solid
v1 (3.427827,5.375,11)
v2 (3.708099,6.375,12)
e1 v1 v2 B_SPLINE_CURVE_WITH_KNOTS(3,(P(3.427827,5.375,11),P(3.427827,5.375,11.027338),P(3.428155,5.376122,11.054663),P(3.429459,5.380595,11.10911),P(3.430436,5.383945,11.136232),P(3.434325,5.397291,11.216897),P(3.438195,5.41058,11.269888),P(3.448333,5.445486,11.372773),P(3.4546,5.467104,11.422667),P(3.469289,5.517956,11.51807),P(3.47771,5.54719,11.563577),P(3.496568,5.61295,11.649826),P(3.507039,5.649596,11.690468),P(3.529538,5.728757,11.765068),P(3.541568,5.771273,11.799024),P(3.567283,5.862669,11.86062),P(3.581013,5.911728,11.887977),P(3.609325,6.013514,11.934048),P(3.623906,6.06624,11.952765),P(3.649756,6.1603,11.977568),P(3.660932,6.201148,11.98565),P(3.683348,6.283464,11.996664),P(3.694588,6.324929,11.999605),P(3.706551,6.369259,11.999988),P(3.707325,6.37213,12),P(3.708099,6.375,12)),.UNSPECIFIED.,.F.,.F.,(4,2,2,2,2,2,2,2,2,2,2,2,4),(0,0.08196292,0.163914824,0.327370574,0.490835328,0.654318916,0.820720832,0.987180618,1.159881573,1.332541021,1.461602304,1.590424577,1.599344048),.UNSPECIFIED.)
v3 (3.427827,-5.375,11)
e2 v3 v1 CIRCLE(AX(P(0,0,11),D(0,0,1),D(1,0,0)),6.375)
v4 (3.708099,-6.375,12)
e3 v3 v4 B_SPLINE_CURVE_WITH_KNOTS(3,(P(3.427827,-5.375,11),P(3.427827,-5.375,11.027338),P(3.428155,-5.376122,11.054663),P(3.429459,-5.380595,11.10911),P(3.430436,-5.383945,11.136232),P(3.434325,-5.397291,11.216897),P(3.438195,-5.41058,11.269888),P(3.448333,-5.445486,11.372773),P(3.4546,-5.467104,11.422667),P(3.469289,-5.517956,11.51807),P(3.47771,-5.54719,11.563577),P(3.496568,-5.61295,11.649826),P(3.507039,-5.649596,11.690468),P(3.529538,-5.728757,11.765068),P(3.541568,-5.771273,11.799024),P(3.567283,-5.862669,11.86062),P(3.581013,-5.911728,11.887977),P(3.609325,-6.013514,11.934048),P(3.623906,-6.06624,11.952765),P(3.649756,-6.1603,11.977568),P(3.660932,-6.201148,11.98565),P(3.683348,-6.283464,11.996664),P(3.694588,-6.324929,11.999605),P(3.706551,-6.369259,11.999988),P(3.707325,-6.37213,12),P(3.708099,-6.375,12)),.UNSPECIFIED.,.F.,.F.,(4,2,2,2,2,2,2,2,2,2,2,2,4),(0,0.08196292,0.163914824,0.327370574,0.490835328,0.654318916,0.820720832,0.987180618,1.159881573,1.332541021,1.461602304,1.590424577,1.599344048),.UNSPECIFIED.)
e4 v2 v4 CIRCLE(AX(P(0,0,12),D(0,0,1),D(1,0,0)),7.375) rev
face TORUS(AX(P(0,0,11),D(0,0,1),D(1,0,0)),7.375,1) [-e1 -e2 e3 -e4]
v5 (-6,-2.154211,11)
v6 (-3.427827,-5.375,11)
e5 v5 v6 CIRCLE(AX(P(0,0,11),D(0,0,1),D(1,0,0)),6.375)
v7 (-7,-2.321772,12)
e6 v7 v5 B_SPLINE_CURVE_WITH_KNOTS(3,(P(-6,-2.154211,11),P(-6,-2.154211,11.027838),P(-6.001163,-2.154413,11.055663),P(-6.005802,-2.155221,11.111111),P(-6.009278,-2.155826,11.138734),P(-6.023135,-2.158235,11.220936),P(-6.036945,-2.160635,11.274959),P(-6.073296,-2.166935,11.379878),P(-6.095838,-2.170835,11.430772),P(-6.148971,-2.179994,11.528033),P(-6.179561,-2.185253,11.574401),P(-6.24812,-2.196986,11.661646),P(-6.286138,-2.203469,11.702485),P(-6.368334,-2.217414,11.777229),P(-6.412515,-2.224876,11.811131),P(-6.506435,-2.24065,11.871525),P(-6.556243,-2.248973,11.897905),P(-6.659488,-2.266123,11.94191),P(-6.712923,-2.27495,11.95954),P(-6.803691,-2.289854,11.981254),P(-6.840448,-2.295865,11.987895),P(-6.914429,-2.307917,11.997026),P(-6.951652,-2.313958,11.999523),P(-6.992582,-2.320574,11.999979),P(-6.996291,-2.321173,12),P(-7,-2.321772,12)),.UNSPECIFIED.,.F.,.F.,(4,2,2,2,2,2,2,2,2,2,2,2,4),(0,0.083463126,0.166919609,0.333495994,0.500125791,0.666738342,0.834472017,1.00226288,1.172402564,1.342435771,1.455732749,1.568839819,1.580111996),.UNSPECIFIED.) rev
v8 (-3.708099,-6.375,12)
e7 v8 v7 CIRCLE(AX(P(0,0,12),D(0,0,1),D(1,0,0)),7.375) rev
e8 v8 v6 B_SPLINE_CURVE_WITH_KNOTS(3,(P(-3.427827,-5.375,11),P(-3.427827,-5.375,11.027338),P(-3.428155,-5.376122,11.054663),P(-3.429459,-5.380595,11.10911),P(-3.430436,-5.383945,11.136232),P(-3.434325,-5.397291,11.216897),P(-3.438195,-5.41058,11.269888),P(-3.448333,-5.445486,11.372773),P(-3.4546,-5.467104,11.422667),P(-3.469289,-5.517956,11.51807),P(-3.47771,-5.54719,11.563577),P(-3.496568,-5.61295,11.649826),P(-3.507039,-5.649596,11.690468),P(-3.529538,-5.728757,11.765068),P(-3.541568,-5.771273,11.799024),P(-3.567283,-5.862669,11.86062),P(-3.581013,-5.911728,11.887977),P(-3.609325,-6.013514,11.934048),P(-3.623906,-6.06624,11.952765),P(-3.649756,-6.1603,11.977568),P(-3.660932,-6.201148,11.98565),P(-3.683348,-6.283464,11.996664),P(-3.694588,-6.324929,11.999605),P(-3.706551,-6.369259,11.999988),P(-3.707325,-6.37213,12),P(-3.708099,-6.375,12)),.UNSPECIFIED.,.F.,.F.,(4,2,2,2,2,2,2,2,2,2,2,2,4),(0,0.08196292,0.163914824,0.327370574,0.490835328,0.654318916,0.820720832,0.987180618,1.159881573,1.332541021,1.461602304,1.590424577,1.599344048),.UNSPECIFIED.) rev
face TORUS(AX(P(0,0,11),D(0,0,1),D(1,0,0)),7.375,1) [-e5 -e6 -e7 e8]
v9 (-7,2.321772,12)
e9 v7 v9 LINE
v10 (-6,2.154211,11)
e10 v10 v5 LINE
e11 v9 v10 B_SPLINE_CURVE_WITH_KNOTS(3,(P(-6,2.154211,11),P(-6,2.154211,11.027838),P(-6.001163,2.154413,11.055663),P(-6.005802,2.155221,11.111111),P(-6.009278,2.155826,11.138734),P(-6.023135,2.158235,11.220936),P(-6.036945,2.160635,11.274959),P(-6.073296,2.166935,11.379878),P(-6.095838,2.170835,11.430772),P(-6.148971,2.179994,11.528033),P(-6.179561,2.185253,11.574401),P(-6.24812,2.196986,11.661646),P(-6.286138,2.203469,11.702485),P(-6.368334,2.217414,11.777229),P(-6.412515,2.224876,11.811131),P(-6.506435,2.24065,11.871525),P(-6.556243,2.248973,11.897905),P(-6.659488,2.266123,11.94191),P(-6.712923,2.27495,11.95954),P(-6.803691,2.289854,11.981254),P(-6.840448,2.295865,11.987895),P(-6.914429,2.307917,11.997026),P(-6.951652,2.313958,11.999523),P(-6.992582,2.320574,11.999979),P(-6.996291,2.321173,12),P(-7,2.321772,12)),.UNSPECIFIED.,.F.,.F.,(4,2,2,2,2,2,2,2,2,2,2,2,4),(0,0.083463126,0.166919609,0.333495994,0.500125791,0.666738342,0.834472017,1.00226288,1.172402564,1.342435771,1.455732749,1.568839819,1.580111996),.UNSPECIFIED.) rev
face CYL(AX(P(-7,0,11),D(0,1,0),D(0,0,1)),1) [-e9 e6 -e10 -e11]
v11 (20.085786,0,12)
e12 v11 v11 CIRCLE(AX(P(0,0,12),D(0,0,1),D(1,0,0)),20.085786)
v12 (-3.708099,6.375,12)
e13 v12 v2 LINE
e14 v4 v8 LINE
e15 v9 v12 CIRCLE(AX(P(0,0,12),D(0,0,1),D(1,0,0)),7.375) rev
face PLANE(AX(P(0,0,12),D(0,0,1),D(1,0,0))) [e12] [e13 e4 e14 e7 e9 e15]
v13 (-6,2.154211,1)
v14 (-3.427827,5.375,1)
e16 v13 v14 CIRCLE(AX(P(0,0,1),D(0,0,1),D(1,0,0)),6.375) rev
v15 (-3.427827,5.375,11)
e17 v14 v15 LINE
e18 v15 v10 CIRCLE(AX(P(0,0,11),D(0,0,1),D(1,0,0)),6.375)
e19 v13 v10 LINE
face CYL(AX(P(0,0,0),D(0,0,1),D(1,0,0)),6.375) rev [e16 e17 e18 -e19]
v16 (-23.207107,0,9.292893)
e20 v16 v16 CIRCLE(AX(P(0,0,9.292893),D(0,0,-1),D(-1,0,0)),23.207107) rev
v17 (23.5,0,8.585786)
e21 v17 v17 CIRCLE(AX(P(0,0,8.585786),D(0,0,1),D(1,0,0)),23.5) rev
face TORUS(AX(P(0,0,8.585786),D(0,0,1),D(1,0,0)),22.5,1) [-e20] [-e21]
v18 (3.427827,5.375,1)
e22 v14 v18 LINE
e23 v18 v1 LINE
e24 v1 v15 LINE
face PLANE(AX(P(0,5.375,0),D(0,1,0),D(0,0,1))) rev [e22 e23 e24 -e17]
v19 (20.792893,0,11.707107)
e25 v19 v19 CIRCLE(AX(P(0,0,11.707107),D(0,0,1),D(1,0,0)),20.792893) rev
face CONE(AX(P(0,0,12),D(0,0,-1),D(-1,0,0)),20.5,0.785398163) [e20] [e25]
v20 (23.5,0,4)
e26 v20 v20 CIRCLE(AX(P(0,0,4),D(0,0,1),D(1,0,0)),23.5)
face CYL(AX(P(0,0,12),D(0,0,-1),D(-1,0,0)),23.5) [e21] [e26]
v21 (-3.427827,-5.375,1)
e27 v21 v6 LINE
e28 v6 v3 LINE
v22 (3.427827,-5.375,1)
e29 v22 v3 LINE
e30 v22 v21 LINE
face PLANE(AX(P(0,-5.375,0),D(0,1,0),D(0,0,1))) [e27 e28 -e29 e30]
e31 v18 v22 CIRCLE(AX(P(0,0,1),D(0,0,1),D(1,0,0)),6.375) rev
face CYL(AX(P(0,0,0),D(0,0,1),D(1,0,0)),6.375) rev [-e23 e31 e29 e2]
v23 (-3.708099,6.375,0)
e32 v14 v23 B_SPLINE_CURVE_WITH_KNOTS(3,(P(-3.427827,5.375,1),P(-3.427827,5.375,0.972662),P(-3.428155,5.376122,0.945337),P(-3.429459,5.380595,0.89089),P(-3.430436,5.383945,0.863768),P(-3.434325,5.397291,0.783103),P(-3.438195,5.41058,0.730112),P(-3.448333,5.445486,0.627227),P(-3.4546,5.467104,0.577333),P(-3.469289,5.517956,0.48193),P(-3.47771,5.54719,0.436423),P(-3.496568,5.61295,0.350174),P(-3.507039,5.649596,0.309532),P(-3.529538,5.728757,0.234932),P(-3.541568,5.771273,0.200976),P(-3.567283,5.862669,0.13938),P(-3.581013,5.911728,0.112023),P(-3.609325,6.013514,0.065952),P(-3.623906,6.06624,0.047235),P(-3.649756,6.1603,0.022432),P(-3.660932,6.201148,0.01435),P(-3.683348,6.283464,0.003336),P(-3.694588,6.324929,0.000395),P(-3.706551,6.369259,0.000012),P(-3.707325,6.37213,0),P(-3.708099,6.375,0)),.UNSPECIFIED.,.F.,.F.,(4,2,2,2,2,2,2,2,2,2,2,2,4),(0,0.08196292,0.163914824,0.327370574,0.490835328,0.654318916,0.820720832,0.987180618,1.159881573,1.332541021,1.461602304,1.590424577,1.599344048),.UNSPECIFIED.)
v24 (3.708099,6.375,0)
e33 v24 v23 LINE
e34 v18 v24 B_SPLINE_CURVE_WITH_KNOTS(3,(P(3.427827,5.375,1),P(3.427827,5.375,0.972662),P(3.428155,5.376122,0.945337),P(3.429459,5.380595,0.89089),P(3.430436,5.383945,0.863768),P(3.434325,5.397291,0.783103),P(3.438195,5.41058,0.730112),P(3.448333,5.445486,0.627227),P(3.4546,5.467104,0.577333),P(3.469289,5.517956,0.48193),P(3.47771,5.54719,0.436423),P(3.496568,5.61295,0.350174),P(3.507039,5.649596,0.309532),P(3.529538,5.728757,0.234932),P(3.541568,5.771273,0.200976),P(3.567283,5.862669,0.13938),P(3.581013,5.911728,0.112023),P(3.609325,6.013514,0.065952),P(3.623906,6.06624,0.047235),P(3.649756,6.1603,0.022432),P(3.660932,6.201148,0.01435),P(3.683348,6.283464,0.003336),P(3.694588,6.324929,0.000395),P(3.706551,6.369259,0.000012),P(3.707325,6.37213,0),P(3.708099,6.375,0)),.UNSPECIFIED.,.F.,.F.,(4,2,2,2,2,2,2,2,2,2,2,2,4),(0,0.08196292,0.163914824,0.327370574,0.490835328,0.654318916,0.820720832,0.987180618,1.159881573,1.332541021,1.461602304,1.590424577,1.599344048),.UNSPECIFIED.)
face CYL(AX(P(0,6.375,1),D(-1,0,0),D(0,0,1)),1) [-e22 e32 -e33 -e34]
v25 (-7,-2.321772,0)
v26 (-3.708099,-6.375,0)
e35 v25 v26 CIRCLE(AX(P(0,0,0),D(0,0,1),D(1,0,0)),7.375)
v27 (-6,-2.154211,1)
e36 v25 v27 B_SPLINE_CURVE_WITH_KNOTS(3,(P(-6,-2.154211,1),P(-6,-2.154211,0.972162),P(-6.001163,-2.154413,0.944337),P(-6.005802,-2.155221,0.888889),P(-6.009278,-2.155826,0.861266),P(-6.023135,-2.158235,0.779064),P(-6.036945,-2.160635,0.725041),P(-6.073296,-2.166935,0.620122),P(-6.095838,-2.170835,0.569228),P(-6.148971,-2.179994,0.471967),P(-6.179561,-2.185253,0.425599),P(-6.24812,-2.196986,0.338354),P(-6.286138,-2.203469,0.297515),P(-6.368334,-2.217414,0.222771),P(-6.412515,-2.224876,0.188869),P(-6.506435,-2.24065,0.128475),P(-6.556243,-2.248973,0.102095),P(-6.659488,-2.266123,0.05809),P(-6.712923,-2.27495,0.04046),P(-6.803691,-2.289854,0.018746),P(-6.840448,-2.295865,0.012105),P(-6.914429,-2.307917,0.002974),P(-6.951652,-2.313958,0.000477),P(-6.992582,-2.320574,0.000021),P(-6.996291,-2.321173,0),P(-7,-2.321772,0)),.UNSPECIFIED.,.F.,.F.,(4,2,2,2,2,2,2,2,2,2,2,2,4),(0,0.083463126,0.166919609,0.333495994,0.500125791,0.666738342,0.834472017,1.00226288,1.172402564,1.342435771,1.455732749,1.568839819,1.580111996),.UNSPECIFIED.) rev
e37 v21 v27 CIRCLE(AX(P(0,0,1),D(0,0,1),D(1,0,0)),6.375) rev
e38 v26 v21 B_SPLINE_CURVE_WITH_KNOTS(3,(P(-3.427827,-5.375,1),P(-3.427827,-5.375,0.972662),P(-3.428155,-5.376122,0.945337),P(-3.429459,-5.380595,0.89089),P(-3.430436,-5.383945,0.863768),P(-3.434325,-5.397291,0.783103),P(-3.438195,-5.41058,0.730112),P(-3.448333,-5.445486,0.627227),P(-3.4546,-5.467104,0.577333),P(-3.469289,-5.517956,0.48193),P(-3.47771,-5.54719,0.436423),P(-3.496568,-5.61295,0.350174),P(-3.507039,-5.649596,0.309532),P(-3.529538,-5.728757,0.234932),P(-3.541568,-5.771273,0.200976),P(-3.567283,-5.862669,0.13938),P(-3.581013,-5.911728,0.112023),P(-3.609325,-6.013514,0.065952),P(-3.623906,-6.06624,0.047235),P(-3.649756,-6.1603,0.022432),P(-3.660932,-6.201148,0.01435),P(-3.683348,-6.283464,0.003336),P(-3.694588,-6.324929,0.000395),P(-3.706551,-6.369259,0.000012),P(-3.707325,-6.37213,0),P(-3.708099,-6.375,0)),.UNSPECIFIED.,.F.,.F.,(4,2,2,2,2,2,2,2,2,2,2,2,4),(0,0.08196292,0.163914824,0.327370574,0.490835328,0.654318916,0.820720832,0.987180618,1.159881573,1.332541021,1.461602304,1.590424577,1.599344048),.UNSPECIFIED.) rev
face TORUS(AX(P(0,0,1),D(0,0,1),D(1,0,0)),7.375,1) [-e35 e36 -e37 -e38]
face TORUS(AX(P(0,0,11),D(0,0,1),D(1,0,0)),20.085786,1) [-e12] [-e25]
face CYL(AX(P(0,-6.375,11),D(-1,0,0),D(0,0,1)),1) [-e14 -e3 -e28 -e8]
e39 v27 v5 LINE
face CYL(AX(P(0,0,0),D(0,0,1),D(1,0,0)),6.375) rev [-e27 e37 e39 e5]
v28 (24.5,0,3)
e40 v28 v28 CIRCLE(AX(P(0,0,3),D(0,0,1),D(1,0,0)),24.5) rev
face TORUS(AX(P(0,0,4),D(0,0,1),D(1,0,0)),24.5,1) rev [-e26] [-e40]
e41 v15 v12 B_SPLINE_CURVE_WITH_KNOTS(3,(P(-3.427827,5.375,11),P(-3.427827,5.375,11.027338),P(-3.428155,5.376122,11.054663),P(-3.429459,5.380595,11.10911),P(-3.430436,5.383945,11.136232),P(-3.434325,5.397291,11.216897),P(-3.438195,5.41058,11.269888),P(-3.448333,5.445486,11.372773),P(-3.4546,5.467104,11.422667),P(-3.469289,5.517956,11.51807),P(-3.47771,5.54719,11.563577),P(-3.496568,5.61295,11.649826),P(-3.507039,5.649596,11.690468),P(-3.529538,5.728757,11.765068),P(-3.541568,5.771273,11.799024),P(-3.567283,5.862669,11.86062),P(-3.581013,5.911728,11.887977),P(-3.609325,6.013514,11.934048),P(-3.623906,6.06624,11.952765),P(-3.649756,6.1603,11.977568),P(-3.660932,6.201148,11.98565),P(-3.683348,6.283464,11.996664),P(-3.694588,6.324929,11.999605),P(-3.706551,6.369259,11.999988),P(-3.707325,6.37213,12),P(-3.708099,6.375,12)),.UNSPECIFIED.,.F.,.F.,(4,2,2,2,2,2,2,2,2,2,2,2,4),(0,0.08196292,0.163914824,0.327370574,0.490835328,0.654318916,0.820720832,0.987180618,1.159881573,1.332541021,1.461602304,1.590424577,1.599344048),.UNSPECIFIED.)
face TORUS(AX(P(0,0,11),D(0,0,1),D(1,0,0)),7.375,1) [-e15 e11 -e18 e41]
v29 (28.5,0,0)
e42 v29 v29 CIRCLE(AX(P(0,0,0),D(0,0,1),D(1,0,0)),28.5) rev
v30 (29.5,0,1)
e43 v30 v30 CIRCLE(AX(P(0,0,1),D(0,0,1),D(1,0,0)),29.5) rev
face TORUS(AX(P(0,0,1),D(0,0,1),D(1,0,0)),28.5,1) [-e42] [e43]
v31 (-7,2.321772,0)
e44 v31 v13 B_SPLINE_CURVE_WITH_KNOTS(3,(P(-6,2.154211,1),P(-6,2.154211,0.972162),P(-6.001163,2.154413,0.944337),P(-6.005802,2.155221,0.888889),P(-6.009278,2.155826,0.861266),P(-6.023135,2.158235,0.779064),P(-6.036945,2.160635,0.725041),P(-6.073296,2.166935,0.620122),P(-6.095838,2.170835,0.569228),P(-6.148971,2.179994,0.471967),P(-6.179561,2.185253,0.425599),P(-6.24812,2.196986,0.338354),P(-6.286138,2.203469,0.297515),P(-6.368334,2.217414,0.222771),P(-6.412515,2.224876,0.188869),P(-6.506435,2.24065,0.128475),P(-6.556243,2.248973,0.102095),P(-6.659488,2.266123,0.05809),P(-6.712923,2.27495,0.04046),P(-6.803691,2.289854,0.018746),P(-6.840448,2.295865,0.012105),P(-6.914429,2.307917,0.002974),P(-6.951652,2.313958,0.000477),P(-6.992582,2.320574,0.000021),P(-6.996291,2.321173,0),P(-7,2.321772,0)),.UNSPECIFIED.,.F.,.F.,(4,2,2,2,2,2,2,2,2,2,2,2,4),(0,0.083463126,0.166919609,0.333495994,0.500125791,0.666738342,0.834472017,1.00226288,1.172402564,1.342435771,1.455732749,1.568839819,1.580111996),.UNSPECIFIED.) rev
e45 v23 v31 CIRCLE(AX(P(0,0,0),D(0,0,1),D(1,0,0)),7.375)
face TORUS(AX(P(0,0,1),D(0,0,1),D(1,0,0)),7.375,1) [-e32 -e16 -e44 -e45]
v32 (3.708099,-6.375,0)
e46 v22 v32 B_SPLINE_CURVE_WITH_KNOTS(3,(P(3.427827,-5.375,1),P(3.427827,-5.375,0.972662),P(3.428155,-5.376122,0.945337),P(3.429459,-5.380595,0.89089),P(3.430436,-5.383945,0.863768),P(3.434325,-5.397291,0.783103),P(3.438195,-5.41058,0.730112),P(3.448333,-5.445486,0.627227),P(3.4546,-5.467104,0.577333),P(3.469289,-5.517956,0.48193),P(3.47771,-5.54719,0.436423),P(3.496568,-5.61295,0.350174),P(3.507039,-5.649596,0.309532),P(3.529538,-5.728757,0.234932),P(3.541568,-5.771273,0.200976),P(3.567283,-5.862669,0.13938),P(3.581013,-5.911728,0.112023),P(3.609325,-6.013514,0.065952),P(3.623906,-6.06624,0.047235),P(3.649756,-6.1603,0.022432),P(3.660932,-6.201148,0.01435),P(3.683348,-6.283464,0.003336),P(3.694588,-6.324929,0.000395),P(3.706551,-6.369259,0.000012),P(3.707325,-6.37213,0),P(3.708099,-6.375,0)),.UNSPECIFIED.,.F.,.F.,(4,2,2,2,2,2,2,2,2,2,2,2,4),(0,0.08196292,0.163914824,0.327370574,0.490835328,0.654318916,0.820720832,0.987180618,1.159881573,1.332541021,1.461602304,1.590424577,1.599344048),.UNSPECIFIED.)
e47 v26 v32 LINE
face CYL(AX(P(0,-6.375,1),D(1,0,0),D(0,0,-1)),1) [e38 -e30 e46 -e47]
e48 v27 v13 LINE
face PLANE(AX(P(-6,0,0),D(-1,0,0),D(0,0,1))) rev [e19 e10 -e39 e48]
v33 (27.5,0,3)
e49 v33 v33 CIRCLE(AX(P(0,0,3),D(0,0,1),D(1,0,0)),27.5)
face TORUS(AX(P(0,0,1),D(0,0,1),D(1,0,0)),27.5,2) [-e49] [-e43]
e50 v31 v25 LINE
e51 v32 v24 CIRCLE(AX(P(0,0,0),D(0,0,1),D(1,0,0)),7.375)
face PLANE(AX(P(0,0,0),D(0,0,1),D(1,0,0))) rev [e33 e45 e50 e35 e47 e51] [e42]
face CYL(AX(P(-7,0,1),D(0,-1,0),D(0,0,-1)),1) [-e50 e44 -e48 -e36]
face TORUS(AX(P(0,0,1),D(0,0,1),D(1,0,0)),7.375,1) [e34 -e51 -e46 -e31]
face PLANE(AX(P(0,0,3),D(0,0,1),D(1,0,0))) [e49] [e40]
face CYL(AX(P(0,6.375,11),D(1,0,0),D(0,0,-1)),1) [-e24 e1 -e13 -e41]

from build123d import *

# Parameters (mm, degrees)
SKETCH1_R           = 29.5
BOSS_EXTRUDE1_DEPTH = 3
SKETCH2_R           = 23.5
BOSS_EXTRUDE2_DEPTH = 9
CUT_EXTRUDE1_DEPTH  = 44.410828142
FILLET1_R           = 2
CHAMFER1_SIZE       = 3
FILLET2_R           = 1
FILLET3_R           = 1


with BuildPart() as part:
    # Sketch1 → Boss-Extrude1 (new body)
    with BuildSketch(Plane.XY):
        Circle(SKETCH1_R)
    extrude(amount=BOSS_EXTRUDE1_DEPTH)

    # Sketch2 → Boss-Extrude2 (add)
    with BuildSketch(Plane.XY.offset(3)):
        Circle(SKETCH2_R)
    extrude(amount=BOSS_EXTRUDE2_DEPTH)

    # Sketch3 → Cut-Extrude1 (cut, through all)
    with BuildSketch(Plane.XY.offset(12)):
        with BuildLine():
            ThreePointArc((6.375, 0), (5.589857961, 3.064981726), (3.4278273, 5.375))
            Line((3.4278273, 5.375), (-3.4278273, 5.375))
            ThreePointArc((-3.4278273, 5.375), (-4.981400642, 3.97822481), (-6, 2.154210992))
            Line((-6, 2.154210992), (-6, -2.154210992))
            ThreePointArc((-6, -2.154210992), (-4.981400642, -3.97822481), (-3.4278273, -5.375))
            Line((-3.4278273, -5.375), (3.4278273, -5.375))
            ThreePointArc((3.4278273, -5.375), (5.589857961, -3.064981726), (6.375, 0))
        make_face()
    extrude(amount=-CUT_EXTRUDE1_DEPTH, mode=Mode.SUBTRACT)

    # Fillet1
    fillet1_edges = [part.edges().sort_by_distance(p)[0] for p in [
        (-29.5, 0, 3),
    ]]
    fillet(fillet1_edges, radius=FILLET1_R)

    # Chamfer1
    chamfer1_edges = [part.edges().sort_by_distance(p)[0] for p in [
        (-23.5, 0, 12),
    ]]
    chamfer(chamfer1_edges, length=CHAMFER1_SIZE)

    # Fillet2
    fillet2_edges = [part.edges().sort_by_distance(p)[0] for p in [
        (0, 5.375, 0),
        (6.375, 0, 0),
        (0, -5.375, 12),
        (-4.981400642, -3.97822481, 0),
        (-6, 0, 0),
        (-4.981400642, 3.97822481, 0),
        (0, -5.375, 0),
        (0, 5.375, 12),
        (-29.5, 0, 0),
        (-4.981400642, 3.97822481, 12),
        (-6, 0, 12),
        (-4.981400642, -3.97822481, 12),
        (6.375, 0, 12),
        (-20.5, 0, 12),
        (-23.5, 0, 9),
    ]]
    fillet(fillet2_edges, radius=FILLET2_R - 0.0001)  # a hair under: the kernel refuses the full size

    # Fillet3
    fillet3_edges = [part.edges().sort_by_distance(p)[0] for p in [
        (-23.5, 0, 3),
    ]]
    fillet(fillet3_edges, radius=FILLET3_R)


solid = part.part
